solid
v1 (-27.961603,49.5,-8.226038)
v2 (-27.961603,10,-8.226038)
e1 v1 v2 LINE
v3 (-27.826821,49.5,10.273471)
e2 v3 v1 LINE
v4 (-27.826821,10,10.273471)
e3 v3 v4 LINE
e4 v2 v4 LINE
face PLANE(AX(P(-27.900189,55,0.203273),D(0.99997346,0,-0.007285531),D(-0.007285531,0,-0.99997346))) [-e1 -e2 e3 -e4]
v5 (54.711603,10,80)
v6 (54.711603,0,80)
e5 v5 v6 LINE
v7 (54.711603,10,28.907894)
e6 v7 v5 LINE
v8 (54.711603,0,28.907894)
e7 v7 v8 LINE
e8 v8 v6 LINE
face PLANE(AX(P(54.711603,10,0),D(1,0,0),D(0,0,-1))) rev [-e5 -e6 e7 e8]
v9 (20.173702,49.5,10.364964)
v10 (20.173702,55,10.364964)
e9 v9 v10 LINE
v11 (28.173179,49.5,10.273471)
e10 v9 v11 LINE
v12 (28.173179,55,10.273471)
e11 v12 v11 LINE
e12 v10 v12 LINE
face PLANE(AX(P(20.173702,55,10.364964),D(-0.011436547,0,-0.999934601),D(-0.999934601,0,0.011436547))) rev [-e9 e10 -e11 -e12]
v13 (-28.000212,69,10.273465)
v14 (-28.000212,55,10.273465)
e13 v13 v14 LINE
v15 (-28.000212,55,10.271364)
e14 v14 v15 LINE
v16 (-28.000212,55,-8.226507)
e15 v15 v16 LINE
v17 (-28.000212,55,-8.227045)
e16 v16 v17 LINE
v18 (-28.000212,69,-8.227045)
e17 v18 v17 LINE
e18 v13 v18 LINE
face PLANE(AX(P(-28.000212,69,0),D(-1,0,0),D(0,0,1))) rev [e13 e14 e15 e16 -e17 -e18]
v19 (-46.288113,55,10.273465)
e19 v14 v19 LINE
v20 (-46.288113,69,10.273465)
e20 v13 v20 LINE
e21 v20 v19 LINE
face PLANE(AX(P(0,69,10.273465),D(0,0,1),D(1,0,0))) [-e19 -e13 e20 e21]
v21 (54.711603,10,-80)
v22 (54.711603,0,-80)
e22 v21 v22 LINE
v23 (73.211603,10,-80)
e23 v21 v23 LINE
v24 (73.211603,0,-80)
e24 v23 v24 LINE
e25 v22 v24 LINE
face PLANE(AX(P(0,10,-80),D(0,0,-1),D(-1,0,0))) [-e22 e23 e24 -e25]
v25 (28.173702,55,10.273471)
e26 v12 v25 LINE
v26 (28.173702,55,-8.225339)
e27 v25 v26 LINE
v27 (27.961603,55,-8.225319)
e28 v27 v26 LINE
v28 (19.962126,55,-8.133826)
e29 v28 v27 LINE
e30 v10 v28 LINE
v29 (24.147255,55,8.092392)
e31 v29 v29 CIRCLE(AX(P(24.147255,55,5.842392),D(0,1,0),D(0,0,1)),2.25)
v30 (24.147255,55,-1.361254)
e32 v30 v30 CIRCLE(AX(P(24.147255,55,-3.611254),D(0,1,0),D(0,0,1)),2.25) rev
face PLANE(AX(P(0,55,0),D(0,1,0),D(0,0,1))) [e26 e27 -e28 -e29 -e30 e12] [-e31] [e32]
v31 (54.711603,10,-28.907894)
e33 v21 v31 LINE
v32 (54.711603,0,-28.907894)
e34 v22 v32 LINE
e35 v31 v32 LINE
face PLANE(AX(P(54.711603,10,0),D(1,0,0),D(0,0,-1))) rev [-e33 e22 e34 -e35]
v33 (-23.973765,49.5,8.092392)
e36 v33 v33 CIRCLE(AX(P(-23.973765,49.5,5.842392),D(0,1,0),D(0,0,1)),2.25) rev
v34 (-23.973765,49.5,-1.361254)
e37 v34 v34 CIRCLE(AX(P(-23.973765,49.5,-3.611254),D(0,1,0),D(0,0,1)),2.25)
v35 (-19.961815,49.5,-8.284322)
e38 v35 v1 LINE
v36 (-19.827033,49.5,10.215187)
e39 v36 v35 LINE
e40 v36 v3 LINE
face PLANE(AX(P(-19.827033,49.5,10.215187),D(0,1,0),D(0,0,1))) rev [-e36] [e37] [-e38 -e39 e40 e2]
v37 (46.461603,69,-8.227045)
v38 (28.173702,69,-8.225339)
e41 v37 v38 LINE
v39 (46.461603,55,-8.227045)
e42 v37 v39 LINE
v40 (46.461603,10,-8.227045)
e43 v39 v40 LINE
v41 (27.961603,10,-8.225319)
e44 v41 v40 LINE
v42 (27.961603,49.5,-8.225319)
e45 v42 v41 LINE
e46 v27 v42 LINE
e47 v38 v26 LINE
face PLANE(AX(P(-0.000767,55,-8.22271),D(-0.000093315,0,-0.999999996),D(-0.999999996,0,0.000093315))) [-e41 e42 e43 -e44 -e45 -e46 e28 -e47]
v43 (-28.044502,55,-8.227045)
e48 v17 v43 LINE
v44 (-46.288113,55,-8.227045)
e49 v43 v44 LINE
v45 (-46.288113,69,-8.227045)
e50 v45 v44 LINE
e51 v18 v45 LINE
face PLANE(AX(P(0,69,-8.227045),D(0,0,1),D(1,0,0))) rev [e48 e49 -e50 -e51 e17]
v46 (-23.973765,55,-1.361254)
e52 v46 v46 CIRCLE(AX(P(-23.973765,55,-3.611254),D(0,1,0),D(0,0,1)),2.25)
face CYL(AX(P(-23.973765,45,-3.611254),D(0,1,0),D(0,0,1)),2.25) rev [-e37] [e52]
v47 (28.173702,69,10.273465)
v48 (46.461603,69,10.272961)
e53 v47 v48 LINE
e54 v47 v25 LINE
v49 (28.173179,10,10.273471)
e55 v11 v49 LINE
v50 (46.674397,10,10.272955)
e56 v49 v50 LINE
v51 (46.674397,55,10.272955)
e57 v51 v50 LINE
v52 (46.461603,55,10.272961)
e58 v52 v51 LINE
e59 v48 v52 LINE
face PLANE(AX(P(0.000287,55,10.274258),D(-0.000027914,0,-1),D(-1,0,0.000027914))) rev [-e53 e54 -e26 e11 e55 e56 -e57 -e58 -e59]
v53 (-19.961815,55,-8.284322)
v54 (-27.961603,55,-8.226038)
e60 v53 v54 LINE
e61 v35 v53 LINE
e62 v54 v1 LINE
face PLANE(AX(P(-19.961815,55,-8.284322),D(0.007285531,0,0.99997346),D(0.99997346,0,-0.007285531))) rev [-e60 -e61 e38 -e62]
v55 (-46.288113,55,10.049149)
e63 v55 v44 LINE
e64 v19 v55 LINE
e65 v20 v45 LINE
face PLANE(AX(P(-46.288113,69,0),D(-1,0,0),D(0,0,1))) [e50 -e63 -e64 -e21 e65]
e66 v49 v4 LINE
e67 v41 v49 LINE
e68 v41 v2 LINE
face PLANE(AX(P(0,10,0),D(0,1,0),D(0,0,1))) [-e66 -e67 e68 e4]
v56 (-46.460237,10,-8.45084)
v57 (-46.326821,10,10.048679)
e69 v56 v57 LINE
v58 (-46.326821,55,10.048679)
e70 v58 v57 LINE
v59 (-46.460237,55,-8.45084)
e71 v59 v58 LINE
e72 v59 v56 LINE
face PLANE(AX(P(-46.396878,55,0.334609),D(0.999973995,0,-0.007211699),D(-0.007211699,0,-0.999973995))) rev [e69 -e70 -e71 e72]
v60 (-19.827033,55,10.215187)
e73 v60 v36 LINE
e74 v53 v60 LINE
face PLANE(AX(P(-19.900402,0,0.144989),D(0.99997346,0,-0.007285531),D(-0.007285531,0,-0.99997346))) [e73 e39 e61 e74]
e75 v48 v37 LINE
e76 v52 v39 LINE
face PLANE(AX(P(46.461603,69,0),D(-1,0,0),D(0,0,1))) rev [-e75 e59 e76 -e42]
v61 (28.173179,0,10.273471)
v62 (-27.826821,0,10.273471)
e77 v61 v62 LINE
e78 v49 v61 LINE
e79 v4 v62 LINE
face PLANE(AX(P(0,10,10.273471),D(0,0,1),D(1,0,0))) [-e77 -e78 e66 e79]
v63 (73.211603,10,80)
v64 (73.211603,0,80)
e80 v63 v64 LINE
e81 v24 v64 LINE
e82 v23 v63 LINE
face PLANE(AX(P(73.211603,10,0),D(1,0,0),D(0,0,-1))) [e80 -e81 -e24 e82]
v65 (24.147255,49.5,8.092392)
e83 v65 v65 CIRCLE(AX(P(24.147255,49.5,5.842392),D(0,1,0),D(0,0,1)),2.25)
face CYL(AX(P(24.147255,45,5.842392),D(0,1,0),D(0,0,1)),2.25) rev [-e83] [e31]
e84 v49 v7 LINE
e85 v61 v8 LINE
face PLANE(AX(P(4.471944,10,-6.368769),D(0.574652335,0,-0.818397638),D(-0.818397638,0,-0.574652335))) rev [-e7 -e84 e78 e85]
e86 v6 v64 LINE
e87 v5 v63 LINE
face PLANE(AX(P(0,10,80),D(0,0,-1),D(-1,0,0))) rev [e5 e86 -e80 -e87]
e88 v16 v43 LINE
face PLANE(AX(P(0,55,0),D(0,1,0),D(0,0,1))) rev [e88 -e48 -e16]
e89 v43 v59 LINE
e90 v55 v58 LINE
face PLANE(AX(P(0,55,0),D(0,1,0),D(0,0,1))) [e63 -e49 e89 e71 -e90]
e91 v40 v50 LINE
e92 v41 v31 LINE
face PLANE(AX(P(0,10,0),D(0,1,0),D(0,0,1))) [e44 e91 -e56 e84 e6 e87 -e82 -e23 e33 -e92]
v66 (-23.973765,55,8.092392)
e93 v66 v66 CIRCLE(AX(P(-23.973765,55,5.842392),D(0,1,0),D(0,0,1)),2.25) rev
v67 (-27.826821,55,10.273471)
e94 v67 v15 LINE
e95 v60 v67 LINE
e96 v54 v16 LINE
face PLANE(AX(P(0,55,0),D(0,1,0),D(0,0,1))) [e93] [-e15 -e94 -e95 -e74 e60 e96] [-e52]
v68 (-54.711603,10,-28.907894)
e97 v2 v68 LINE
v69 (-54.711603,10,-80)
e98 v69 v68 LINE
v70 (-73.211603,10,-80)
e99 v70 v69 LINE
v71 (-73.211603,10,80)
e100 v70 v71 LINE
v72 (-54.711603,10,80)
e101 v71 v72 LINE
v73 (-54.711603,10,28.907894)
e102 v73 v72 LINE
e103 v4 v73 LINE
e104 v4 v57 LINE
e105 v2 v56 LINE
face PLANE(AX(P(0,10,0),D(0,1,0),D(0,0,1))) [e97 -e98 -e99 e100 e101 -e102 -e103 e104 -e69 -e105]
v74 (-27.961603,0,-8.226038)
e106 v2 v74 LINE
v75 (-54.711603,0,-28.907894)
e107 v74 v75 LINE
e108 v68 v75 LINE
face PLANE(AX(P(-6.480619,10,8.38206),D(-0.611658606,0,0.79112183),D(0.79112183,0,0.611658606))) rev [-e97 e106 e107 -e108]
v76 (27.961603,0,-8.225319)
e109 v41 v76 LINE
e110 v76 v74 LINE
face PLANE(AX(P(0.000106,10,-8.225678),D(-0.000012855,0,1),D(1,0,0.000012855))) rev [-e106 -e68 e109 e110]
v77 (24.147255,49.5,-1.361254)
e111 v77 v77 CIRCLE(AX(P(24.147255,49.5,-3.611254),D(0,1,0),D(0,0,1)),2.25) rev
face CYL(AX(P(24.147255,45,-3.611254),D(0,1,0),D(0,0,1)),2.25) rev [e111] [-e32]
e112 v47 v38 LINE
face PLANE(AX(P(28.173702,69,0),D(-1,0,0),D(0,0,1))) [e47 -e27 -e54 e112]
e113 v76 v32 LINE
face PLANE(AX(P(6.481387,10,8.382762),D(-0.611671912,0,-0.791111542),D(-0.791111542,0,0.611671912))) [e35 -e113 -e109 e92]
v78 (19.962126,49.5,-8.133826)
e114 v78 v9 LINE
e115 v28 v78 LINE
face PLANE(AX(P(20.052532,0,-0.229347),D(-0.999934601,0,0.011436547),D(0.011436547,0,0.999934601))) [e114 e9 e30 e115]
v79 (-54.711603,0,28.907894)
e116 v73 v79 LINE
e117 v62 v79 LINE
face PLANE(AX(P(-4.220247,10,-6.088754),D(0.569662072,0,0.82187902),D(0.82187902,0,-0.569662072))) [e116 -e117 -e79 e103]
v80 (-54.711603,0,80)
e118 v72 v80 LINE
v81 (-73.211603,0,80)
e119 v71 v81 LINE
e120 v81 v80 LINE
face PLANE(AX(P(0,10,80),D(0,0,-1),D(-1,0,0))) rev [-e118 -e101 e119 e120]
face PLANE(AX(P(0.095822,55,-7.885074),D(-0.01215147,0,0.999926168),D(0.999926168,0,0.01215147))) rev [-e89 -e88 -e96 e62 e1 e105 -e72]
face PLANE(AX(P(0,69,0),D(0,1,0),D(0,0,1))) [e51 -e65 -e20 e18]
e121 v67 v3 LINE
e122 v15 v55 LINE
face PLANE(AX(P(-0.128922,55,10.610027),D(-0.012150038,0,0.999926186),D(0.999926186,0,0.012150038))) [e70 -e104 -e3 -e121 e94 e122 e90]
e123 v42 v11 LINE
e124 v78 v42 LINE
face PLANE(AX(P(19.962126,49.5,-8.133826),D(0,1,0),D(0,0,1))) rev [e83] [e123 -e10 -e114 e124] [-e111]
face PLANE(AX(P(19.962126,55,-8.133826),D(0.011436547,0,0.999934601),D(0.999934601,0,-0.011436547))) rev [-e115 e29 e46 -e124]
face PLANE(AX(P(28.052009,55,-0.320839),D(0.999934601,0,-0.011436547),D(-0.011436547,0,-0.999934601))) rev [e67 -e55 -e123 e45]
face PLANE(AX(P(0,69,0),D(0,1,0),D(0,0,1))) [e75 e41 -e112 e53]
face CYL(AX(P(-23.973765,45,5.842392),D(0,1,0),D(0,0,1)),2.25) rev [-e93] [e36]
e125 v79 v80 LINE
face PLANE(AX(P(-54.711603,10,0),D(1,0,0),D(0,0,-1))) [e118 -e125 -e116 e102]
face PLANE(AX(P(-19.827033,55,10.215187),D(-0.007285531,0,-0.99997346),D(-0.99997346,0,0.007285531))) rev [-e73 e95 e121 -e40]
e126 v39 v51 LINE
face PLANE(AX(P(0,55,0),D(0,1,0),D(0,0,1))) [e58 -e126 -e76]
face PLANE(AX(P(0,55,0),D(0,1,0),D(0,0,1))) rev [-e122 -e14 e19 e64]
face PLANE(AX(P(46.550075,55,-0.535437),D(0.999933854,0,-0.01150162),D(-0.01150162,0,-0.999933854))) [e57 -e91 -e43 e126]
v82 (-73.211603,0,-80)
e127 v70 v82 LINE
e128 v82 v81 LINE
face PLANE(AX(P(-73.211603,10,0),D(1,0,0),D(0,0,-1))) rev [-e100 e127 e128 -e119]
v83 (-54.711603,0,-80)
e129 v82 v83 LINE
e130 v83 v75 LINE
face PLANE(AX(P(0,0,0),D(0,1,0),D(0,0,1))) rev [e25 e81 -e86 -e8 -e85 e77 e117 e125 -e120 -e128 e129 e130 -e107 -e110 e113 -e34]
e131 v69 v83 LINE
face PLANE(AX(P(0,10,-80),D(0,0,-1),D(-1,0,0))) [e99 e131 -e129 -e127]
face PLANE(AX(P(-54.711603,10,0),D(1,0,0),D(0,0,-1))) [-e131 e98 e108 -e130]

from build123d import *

# Parameters (mm, degrees)
BOSS_EXTRUDE1_DEPTH     = 10
BOSS_EXTRUDE1_2_DEPTH   = 10
BOSS_EXTRUDE1_3_DEPTH   = 10
BOSS_EXTRUDE5_DEPTH     = 55
SKETCH5_W               = 18.5
SKETCH5_H               = 5.5
BOSS_EXTRUDE6_DEPTH     = 8
SKETCH6_W               = 18.5
SKETCH6_H               = 5.5
BOSS_EXTRUDE7_DEPTH     = 8
BOSS_EXTRUDE8_OUTLINE_W = 18.287900599
BOSS_EXTRUDE8_OUTLINE_H = 18.500510452
BOSS_EXTRUDE8_DEPTH     = 14
SKETCH7_3_R             = 2.25
CUT_EXTRUDE1_DEPTH      = 10


# Read off the part's stored shape, not the designer's step: Boss-Extrude8
with BuildPart() as part:
    # Sketch1 → Boss-Extrude1 (new body)
    with BuildSketch(Plane(origin=(0, 0, 0), x_dir=(1, 0, 0), z_dir=(0, 1, 0))):
        Polygon((-54.711603102, -80), (-54.711603102, -28.907893648), (-27.826820773, -10.273471277), (-46.326820773, -10.048678982), (-46.460237213, 8.450839932), (-27.961603102, 8.226037736), (-54.711603102, 28.907893648), (-54.711603102, 80), (-73.211603102, 80), (-73.211603102, -80), align=None)
    extrude(amount=BOSS_EXTRUDE1_DEPTH)



with BuildPart() as body_2:
    # Sketch1 → Boss-Extrude1 2 (new body)
    with BuildSketch(Plane(origin=(0, 0, 0), x_dir=(1, 0, 0), z_dir=(0, 1, 0))):
        Polygon((-27.961603102, 8.226037736), (-27.826820773, -10.273471277), (28.173179227, -10.273471277), (27.961603102, 8.225318833), align=None)
    extrude(amount=BOSS_EXTRUDE1_2_DEPTH)


with BuildPart() as body_3:
    # Sketch1 → Boss-Extrude1 3 (new body)
    with BuildSketch(Plane(origin=(0, 0, 0), x_dir=(1, 0, 0), z_dir=(0, 1, 0))):
        Polygon((46.674397065, -10.272954842), (28.173179227, -10.273471277), (54.711603102, -28.907893648), (54.711603102, -80), (73.211603102, -80), (73.211603102, 80), (54.711603102, 80), (54.711603102, 28.907893648), (27.961603102, 8.225318833), (46.461603021, 8.227045158), align=None)
    extrude(amount=BOSS_EXTRUDE1_3_DEPTH)


with BuildPart() as part_1:
    add(part.part)

    add(body_2.part)  # Boss-Extrude5 merges body 2

    add(body_3.part)  # Boss-Extrude5 merges body 3
    # Sketch1<9> → Boss-Extrude5 (add)
    with BuildSketch(Plane(origin=(0, 0, 0), x_dir=(1, 0, 0), z_dir=(0, 1, 0))):
        Polygon((46.461603021, 8.227045158), (46.674397065, -10.272954842), (28.173179227, -10.273471277), (27.961603102, 8.225318833), align=None)
        Polygon((-27.961603102, 8.226037736), (-46.460237213, 8.450839932), (-46.326820773, -10.048678982), (-27.826820773, -10.273471277), align=None)
    extrude(amount=BOSS_EXTRUDE5_DEPTH)

    # Sketch5 → Boss-Extrude6 (add)
    with BuildSketch(Plane(origin=(28.052008971, 0, -0.32083911), x_dir=(0.011436547294728296, 0, 0.999934600554444), z_dir=(-0.999934600554444, 0, 0.011436547294728296))):
        with Locations((1.345003295, 52.25)):
            Rectangle(SKETCH5_W, SKETCH5_H)
    extrude(amount=BOSS_EXTRUDE6_DEPTH)

    # Sketch6 → Boss-Extrude7 (add)
    with BuildSketch(Plane(origin=(-27.900189464, 0, 0.203273098), x_dir=(-0.007285531290396893, 0, -0.9999734601647269), z_dir=(0.9999734601647269, 0, -0.007285531290396893))):
        with Locations((-0.820465448, 52.25)):
            Rectangle(SKETCH6_W, SKETCH6_H)
    extrude(amount=BOSS_EXTRUDE7_DEPTH)

    # Boss-Extrude8 outline → Boss-Extrude8 (add)
    with BuildSketch(Plane(origin=(0, 55, 0), x_dir=(1, 0, 0), z_dir=(0, 1, 0))):
        with Locations((-37.144162619, -1.023210068)):
            Rectangle(BOSS_EXTRUDE8_OUTLINE_W, BOSS_EXTRUDE8_OUTLINE_H)
        Polygon((46.461603021, -10.272960782), (46.461603021, 8.227045158), (28.173702422, 8.225338625), (28.173702422, -10.273471263), align=None)
    extrude(amount=BOSS_EXTRUDE8_DEPTH)

    # Sketch7<3> → Cut-Extrude1 (cut, symmetric)
    with BuildSketch(Plane(origin=(0, 55, 0), x_dir=(1, 0, 0), z_dir=(0, 1, 0))):
        with Locations(Location((24.147255407, 3.611254336, 0), (0, 0, 270))):
            Circle(SKETCH7_3_R)
        with Locations(Location((24.147255407, -5.842391538, 0), (0, 0, 270))):
            Circle(SKETCH7_3_R)
        with Locations(Location((-23.973765303, -5.842391538, 0), (0, 0, 270))):
            Circle(SKETCH7_3_R)
        with Locations(Location((-23.973765303, 3.611254336, 0), (0, 0, 270))):
            Circle(SKETCH7_3_R)
    extrude(amount=CUT_EXTRUDE1_DEPTH, both=True, mode=Mode.SUBTRACT)


solid = part_1.part
